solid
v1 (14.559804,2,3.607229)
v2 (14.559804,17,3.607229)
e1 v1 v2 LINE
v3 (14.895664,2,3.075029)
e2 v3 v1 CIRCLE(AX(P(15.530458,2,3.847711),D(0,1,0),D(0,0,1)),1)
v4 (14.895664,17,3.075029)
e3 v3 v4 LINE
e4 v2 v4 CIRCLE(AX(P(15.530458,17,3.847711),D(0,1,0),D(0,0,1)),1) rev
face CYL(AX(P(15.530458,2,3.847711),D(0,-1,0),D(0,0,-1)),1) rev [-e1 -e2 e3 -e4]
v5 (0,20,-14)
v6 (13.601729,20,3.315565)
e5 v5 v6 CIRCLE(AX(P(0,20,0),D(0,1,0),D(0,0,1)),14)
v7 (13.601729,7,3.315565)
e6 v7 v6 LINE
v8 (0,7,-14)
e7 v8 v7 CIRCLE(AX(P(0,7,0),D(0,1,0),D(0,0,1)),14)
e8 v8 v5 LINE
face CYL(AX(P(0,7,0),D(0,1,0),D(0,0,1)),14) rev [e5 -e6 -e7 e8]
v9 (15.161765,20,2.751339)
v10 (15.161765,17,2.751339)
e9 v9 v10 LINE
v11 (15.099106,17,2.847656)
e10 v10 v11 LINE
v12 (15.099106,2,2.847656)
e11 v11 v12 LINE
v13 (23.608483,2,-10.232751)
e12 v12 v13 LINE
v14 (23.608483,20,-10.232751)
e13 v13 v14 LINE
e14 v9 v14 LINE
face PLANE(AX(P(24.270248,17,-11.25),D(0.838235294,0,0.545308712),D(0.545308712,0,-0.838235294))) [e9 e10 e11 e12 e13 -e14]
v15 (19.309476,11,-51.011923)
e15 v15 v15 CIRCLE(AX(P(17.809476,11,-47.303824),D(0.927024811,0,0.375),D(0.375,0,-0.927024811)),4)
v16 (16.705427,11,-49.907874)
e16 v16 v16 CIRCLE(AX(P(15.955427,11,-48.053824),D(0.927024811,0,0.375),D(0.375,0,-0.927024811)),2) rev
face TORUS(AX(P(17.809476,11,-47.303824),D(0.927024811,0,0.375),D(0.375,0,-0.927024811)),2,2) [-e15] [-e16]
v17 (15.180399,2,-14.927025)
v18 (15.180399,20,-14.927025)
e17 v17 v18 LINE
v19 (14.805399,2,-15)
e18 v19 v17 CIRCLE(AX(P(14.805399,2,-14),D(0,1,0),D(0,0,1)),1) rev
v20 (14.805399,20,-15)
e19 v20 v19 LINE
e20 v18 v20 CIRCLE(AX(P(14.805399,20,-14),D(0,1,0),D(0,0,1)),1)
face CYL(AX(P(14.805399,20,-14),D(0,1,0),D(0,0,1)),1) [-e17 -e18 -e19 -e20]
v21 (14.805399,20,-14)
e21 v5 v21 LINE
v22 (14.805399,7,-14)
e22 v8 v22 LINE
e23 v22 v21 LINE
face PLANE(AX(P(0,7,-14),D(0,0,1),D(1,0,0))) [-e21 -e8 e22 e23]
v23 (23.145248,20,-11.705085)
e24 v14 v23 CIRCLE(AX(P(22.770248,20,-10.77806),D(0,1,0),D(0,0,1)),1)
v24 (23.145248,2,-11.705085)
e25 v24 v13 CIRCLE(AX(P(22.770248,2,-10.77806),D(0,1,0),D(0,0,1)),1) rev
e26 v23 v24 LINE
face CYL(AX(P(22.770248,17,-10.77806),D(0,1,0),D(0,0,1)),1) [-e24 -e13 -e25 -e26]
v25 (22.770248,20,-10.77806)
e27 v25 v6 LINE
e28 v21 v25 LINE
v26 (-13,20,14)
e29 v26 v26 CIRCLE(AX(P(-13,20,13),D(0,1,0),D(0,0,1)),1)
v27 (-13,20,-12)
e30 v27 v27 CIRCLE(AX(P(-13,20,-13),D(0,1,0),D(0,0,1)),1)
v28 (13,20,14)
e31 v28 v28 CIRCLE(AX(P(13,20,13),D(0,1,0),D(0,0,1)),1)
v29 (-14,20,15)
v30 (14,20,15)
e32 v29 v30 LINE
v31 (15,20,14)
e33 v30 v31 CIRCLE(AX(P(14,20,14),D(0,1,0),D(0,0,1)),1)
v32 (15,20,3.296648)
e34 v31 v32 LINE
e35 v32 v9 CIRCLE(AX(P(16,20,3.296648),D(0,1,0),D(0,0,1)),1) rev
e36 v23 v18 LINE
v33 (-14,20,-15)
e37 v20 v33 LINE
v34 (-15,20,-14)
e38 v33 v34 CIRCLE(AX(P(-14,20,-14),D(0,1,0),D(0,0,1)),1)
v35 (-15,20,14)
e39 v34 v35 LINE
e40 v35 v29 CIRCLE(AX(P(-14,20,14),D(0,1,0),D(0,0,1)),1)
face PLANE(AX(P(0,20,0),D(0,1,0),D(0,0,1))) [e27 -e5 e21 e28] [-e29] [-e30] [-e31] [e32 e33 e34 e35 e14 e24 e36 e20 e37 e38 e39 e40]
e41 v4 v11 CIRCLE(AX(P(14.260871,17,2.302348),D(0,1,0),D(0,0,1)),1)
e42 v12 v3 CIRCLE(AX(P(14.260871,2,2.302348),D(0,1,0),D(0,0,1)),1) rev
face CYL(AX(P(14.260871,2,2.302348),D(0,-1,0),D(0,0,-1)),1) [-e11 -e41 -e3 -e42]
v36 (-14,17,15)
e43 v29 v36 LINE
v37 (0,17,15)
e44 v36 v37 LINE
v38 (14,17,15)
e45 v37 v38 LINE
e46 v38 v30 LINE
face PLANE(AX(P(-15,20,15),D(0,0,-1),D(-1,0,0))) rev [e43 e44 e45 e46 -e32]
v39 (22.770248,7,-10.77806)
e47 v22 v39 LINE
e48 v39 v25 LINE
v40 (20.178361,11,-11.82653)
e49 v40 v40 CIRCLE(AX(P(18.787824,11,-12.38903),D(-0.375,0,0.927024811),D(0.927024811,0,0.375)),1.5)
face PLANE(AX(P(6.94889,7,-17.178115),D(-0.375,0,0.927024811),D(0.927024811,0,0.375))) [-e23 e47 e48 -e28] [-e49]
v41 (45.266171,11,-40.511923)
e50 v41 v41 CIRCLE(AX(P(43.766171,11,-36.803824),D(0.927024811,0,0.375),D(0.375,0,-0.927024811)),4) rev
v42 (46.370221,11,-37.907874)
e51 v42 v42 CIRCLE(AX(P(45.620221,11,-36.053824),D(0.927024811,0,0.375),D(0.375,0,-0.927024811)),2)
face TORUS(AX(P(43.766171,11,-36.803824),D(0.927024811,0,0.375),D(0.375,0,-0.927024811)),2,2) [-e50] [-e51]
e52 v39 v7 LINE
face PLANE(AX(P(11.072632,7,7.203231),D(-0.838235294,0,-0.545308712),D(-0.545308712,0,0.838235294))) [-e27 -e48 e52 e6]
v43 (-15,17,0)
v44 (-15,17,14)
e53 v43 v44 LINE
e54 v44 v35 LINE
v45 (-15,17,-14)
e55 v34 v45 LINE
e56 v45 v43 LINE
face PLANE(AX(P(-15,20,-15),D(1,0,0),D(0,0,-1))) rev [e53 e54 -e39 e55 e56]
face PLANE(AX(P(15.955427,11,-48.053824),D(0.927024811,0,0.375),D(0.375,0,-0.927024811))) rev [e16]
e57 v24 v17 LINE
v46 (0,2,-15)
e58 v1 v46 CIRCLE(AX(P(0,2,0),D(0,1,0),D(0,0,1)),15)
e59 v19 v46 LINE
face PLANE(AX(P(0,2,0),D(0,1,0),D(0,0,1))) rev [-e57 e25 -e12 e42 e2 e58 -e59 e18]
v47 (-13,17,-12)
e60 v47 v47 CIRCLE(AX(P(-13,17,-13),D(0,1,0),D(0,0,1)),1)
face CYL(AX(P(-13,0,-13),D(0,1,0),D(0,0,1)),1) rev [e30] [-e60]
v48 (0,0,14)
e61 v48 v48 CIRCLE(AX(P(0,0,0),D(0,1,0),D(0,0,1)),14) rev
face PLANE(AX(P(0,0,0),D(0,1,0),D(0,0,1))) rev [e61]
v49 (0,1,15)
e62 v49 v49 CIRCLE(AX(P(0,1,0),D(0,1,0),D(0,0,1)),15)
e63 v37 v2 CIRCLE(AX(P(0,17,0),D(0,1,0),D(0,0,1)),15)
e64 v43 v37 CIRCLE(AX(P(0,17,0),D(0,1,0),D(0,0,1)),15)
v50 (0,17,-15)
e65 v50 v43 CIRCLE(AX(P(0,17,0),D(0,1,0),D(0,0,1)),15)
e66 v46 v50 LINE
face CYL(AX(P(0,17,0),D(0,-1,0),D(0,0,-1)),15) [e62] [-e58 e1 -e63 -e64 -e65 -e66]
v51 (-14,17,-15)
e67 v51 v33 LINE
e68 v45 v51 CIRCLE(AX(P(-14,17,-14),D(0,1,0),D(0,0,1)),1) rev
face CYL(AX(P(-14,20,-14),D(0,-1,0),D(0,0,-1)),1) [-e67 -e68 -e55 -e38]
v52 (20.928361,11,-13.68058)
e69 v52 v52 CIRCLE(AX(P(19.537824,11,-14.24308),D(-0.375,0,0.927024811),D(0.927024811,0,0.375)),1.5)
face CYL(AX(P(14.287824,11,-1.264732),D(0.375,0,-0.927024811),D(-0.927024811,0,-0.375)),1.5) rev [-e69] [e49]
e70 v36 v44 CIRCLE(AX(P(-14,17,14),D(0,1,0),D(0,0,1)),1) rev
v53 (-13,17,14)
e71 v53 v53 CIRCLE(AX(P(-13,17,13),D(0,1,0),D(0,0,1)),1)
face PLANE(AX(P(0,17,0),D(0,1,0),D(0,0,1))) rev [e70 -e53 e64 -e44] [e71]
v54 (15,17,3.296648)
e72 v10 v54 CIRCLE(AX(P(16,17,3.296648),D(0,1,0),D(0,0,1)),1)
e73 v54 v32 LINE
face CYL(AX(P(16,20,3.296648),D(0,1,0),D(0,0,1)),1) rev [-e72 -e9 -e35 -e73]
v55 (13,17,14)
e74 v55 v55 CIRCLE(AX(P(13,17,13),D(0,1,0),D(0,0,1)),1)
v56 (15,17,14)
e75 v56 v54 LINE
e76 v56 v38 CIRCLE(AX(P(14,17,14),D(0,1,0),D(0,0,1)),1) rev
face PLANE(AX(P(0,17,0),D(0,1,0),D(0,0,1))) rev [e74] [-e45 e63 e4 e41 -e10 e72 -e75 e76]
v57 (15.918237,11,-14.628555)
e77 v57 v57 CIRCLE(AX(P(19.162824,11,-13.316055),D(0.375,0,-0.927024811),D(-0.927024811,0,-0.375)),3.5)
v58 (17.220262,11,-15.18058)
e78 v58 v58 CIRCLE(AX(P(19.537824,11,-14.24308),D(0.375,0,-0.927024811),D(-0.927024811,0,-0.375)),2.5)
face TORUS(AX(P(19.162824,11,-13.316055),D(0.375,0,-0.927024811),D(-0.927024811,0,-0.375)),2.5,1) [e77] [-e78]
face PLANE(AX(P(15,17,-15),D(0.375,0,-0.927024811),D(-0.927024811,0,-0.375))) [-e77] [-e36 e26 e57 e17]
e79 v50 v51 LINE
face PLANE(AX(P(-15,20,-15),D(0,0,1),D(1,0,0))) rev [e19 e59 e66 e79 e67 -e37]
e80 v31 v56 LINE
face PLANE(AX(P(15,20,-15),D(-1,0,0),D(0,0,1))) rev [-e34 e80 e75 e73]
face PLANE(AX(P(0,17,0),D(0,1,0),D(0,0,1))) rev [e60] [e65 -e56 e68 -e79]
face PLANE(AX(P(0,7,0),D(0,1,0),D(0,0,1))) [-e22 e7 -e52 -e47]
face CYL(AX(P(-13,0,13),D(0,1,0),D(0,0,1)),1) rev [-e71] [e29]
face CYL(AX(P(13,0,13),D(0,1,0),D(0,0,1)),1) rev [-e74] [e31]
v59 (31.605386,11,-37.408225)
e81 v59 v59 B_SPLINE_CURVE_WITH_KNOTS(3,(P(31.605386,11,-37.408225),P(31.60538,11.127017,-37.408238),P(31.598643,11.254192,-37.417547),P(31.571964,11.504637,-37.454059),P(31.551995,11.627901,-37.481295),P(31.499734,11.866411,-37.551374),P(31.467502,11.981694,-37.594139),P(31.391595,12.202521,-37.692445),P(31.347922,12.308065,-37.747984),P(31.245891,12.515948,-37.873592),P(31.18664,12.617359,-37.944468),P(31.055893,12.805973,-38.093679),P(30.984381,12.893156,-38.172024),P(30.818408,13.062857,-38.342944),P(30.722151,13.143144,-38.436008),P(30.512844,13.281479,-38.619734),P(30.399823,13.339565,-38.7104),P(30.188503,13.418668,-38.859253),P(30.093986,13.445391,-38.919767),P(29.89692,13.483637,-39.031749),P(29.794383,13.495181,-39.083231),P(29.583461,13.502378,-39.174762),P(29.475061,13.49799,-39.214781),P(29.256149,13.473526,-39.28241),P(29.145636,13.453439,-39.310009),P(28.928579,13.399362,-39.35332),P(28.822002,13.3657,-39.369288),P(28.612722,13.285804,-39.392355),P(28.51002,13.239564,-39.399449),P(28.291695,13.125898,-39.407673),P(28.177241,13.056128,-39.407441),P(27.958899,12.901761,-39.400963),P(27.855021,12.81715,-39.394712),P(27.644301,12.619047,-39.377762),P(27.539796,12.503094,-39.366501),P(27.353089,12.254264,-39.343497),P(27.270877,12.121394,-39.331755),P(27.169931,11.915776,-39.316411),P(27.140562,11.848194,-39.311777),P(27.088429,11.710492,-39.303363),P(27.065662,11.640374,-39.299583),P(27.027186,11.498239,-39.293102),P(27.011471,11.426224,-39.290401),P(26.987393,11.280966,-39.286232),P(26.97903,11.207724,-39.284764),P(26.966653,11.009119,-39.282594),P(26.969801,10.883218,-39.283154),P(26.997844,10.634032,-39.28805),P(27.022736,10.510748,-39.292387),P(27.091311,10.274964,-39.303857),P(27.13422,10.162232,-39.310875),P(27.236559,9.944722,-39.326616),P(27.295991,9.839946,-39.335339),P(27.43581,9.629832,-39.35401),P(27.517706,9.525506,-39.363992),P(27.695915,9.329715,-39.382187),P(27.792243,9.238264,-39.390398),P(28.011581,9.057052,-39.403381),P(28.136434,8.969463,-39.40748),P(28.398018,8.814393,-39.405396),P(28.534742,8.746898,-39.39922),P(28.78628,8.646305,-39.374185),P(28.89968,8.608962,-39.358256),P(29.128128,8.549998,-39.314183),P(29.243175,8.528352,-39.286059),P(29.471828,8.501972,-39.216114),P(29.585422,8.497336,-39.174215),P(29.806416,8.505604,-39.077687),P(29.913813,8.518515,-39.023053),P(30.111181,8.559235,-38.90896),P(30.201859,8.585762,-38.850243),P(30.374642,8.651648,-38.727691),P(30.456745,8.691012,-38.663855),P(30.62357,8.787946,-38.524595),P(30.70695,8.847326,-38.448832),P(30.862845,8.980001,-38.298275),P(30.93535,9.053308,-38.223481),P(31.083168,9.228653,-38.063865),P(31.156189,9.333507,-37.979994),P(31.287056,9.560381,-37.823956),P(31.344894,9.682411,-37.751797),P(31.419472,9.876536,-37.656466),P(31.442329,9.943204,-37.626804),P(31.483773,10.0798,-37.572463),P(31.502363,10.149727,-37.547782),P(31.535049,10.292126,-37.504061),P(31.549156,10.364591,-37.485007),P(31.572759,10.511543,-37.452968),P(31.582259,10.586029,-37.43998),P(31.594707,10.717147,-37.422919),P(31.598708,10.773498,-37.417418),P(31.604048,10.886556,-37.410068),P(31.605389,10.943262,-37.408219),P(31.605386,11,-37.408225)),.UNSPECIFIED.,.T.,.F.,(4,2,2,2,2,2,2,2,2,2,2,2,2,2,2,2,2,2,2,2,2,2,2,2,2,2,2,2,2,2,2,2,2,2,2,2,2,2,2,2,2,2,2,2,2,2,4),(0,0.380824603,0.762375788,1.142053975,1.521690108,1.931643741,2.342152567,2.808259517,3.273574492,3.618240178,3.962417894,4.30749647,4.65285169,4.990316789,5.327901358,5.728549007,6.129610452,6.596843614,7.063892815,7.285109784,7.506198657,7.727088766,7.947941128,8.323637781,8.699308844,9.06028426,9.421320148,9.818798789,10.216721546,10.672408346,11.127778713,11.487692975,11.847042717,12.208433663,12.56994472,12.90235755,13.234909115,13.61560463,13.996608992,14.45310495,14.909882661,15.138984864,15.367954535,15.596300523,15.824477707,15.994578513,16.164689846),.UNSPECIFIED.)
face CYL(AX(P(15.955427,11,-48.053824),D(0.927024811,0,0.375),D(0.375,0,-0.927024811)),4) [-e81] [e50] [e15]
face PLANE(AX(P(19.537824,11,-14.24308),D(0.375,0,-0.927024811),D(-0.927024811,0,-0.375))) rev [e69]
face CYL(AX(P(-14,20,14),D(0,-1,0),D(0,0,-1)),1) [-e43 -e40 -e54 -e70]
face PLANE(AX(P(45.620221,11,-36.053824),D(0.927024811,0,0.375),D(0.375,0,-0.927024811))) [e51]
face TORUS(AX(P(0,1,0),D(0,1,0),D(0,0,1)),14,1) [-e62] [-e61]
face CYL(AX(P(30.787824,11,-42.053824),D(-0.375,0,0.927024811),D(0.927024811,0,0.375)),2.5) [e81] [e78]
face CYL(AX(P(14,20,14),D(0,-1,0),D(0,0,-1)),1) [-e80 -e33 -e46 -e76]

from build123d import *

# Parameters (mm, degrees)
SKETCH1_R                = 15
BOSS_EXTRUDE1_DEPTH      = 17
SKETCH2_W                = 30
SKETCH2_H                = 30
BOSS_EXTRUDE2_DEPTH      = 3
FILLET2_R                = 1
BOSS_EXTRUDE4_DEPTH      = 3
BOSS_EXTRUDE5_DEPTH      = 18
FILLET5_R                = 1
FILLET6_R                = 1
FILLET7_R                = 1
SKETCH7_R                = 14
CUT_EXTRUDE1_DEPTH       = 13
SKETCH8_R                = 1.5
CUT_EXTRUDE2_DEPTH       = 13
SKETCH9_R                = 3.5
BOSS_EXTRUDE6_DEPTH      = 1
CUT_EXTRUDE3_START       = -1
SKETCH10_R               = 1.5
CUT_EXTRUDE3_DEPTH       = 1
FILLET8_R                = 1
SKETCH13_R               = 1
CUT_EXTRUDE4_DEPTH       = 35.607752779
SKETCH14_R               = 2.5
BOSS_EXTRUDE7_DEPTH      = 30
BOSS_EXTRUDE8_DEPTH      = 16
BOSS_EXTRUDE8_DEPTH_BACK = 16
SKETCH17_R               = 4
FILLET9_R                = 2


# Some blends are built 0.0001 mm under size
with BuildPart() as part:
    # Sketch1 → Boss-Extrude1 (new body)
    with BuildSketch(Plane(origin=(0, 0, 0), x_dir=(1, 0, 0), z_dir=(0, 1, 0))):
        with Locations(Location((0, 0, 0), (0, 0, 270))):
            Circle(SKETCH1_R)
    extrude(amount=BOSS_EXTRUDE1_DEPTH)

    # Sketch2 → Boss-Extrude2 (add)
    with BuildSketch(Plane(origin=(0, 17, 0), x_dir=(1, 0, 0), z_dir=(0, 1, 0))):
        Rectangle(SKETCH2_W, SKETCH2_H)
    extrude(amount=BOSS_EXTRUDE2_DEPTH)

    # Fillet2
    fillet2_edges = [part.edges().sort_by_distance(p)[0] for p in [
        (0, 0, -15),
    ]]
    fillet(fillet2_edges, radius=FILLET2_R)

    # Sketch4 → Boss-Extrude4 (add)
    with BuildSketch(Plane(origin=(0, 20, 0), x_dir=(1, 0, 0), z_dir=(0, 1, 0))):
        Polygon((15, 15), (24.270248109, 11.25), (15, -3), align=None)
    extrude(amount=-BOSS_EXTRUDE4_DEPTH)

    # Sketch6 → Boss-Extrude5 (add)
    with BuildSketch(Plane(origin=(0, 20, 0), x_dir=(1, 0, 0), z_dir=(0, 1, 0))):
        Polygon((15, -3), (0, -3), (0, 15), (15, 15), (24.270248109, 11.25), align=None)
    extrude(amount=-BOSS_EXTRUDE5_DEPTH)

    # Fillet5
    fillet5_edges = [part.edges().sort_by_distance(p)[0] for p in [
        (15, 18.5, 3),
        (24.270248109, 11, -11.25),
        (15, 18.5, 15),
        (15, 11, -15),
        (-15, 18.5, -15),
        (-15, 18.5, 15),
    ]]
    fillet(fillet5_edges, radius=FILLET5_R)

    # Fillet6
    # the kernel refuses this fillet: 1 mm, written as the material it adds along each edge
    with BuildSketch(Plane(origin=(14.696938457, 18.556304537, 3), x_dir=(-0.2202884134263797, 0, 0.9754347824996238), z_dir=(0, -1, 0))) as fillet6_piece_1:
        with BuildLine():
            CenterArc((0.643272542, -0.99978468), FILLET6_R, 91.189014428, 44.048625674)
            Line((-0.066760947, -0.295616771), (-0.080961616, -0.281533412))
            ThreePointArc((-0.080961616, -0.281533412), (-0.052889169, -0.143402617), (-0.019508696, 0.004405768))
            Line((-0.019508696, 0.004405768), (0.000415015, 0.019995694))
            ThreePointArc((0.000415015, 0.019995694), (0.311260907, 0.016770207), (0.6221068, 0.019995694))
            Line((0.6221068, 0.019995694), (0.622521815, 0))
        make_face()
    extrude(amount=16.556304537)

    # Fillet7
    fillet7_edges = [part.edges().sort_by_distance(p)[0] for p in [
        (15, 9.5, 3),
    ]]
    fillet(fillet7_edges, radius=FILLET7_R)

    # Sketch7 → Cut-Extrude1 (cut)
    with BuildSketch(Plane(origin=(0, 20, 0), x_dir=(1, 0, 0), z_dir=(0, 1, 0))):
        with BuildLine():
            Line((14.805399496, 14), (0, 14))
            ThreePointArc((0, 14), (9.899494937, 9.899494937), (14, 0))
            ThreePointArc((14, 0), (13.900075645, -1.66969969), (13.601728992, -3.31556457))
            Line((13.601728992, -3.31556457), (22.770248109, 10.778060096))
            Line((22.770248109, 10.778060096), (14.805399496, 14))
        make_face()
        Circle(SKETCH7_R)
    extrude(amount=-CUT_EXTRUDE1_DEPTH, mode=Mode.SUBTRACT)

    # Sketch8 → Cut-Extrude2 (cut)
    with BuildSketch(Plane(origin=(7.323889561, 0, -18.105139561), x_dir=(-0.927024810886958, 0, -0.3749999999999998), z_dir=(0.3749999999999998, 0, -0.927024810886958))):
        with Locations((-12.770892539, 11)):
            Circle(SKETCH8_R)
    extrude(amount=-CUT_EXTRUDE2_DEPTH, mode=Mode.SUBTRACT)

    # Sketch9 → Boss-Extrude6 (add)
    with BuildSketch(Plane(origin=(7.323889561, 0, -18.105139561), x_dir=(-0.927024810886958, 0, -0.3749999999999998), z_dir=(0.3749999999999998, 0, -0.927024810886958))):
        with Locations((-12.770892539, 11)):
            Circle(SKETCH9_R)
    extrude(amount=BOSS_EXTRUDE6_DEPTH)

    # Sketch10 → Cut-Extrude3 (cut)
    with BuildSketch(Plane(origin=(7.323889561, 0, -18.105139561), x_dir=(0.927024810886958, 0, 0.3749999999999998), z_dir=(-0.3749999999999998, 0, 0.927024810886958)).offset(CUT_EXTRUDE3_START)):
        with Locations((12.770892539, 11)):
            Circle(SKETCH10_R)
    extrude(amount=CUT_EXTRUDE3_DEPTH, mode=Mode.SUBTRACT)

    # Fillet8
    fillet8_edges = [part.edges().sort_by_distance(p)[0] for p in [
        (22.78241064, 11, -12.93057967),
    ]]
    fillet(fillet8_edges, radius=FILLET8_R - 0.0001)  # a hair under: the kernel refuses the full size

    # Sketch13 → Cut-Extrude4 (cut, through all)
    with BuildSketch(Plane(origin=(0, 20, 0), x_dir=(1, 0, 0), z_dir=(0, 1, 0))):
        with Locations(Location((-13, 13, 0), (0, 0, 270))):
            Circle(SKETCH13_R)
        with Locations(Location((-13, -13, 0), (0, 0, 270))):
            Circle(SKETCH13_R)
        with Locations(Location((13, -13, 0), (0, 0, 270))):
            Circle(SKETCH13_R)
    extrude(amount=-CUT_EXTRUDE4_DEPTH, mode=Mode.SUBTRACT)

    # Sketch14 → Boss-Extrude7 (add)
    with BuildSketch(Plane(origin=(7.698889561, 0, -19.032164372), x_dir=(-0.927024810886958, 0, -0.3749999999999998), z_dir=(0.3749999999999998, 0, -0.927024810886958))):
        with Locations((-12.770892539, 11)):
            Circle(SKETCH14_R)
    extrude(amount=BOSS_EXTRUDE7_DEPTH)

    # Sketch17 → Boss-Extrude8 (add, two sides: drawn at the far end of the back side and taken through both)
    with BuildSketch(Plane(origin=(11.838934241, 0, 4.789084702), x_dir=(0.3749999999999998, 0, -0.927024810886958), z_dir=(0.927024810886958, 0, 0.3749999999999998)).offset(-BOSS_EXTRUDE8_DEPTH_BACK)):
        with Locations((50.530372163, 11)):
            Circle(SKETCH17_R)
    extrude(amount=BOSS_EXTRUDE8_DEPTH + BOSS_EXTRUDE8_DEPTH_BACK)

    # Fillet9
    fillet9_edges = [part.edges().sort_by_distance(p)[0] for p in [
        (14.455426828, 11, -44.345724753),
        (44.120220776, 11, -32.345724753),
    ]]
    fillet(fillet9_edges, radius=FILLET9_R)


solid = part.part
